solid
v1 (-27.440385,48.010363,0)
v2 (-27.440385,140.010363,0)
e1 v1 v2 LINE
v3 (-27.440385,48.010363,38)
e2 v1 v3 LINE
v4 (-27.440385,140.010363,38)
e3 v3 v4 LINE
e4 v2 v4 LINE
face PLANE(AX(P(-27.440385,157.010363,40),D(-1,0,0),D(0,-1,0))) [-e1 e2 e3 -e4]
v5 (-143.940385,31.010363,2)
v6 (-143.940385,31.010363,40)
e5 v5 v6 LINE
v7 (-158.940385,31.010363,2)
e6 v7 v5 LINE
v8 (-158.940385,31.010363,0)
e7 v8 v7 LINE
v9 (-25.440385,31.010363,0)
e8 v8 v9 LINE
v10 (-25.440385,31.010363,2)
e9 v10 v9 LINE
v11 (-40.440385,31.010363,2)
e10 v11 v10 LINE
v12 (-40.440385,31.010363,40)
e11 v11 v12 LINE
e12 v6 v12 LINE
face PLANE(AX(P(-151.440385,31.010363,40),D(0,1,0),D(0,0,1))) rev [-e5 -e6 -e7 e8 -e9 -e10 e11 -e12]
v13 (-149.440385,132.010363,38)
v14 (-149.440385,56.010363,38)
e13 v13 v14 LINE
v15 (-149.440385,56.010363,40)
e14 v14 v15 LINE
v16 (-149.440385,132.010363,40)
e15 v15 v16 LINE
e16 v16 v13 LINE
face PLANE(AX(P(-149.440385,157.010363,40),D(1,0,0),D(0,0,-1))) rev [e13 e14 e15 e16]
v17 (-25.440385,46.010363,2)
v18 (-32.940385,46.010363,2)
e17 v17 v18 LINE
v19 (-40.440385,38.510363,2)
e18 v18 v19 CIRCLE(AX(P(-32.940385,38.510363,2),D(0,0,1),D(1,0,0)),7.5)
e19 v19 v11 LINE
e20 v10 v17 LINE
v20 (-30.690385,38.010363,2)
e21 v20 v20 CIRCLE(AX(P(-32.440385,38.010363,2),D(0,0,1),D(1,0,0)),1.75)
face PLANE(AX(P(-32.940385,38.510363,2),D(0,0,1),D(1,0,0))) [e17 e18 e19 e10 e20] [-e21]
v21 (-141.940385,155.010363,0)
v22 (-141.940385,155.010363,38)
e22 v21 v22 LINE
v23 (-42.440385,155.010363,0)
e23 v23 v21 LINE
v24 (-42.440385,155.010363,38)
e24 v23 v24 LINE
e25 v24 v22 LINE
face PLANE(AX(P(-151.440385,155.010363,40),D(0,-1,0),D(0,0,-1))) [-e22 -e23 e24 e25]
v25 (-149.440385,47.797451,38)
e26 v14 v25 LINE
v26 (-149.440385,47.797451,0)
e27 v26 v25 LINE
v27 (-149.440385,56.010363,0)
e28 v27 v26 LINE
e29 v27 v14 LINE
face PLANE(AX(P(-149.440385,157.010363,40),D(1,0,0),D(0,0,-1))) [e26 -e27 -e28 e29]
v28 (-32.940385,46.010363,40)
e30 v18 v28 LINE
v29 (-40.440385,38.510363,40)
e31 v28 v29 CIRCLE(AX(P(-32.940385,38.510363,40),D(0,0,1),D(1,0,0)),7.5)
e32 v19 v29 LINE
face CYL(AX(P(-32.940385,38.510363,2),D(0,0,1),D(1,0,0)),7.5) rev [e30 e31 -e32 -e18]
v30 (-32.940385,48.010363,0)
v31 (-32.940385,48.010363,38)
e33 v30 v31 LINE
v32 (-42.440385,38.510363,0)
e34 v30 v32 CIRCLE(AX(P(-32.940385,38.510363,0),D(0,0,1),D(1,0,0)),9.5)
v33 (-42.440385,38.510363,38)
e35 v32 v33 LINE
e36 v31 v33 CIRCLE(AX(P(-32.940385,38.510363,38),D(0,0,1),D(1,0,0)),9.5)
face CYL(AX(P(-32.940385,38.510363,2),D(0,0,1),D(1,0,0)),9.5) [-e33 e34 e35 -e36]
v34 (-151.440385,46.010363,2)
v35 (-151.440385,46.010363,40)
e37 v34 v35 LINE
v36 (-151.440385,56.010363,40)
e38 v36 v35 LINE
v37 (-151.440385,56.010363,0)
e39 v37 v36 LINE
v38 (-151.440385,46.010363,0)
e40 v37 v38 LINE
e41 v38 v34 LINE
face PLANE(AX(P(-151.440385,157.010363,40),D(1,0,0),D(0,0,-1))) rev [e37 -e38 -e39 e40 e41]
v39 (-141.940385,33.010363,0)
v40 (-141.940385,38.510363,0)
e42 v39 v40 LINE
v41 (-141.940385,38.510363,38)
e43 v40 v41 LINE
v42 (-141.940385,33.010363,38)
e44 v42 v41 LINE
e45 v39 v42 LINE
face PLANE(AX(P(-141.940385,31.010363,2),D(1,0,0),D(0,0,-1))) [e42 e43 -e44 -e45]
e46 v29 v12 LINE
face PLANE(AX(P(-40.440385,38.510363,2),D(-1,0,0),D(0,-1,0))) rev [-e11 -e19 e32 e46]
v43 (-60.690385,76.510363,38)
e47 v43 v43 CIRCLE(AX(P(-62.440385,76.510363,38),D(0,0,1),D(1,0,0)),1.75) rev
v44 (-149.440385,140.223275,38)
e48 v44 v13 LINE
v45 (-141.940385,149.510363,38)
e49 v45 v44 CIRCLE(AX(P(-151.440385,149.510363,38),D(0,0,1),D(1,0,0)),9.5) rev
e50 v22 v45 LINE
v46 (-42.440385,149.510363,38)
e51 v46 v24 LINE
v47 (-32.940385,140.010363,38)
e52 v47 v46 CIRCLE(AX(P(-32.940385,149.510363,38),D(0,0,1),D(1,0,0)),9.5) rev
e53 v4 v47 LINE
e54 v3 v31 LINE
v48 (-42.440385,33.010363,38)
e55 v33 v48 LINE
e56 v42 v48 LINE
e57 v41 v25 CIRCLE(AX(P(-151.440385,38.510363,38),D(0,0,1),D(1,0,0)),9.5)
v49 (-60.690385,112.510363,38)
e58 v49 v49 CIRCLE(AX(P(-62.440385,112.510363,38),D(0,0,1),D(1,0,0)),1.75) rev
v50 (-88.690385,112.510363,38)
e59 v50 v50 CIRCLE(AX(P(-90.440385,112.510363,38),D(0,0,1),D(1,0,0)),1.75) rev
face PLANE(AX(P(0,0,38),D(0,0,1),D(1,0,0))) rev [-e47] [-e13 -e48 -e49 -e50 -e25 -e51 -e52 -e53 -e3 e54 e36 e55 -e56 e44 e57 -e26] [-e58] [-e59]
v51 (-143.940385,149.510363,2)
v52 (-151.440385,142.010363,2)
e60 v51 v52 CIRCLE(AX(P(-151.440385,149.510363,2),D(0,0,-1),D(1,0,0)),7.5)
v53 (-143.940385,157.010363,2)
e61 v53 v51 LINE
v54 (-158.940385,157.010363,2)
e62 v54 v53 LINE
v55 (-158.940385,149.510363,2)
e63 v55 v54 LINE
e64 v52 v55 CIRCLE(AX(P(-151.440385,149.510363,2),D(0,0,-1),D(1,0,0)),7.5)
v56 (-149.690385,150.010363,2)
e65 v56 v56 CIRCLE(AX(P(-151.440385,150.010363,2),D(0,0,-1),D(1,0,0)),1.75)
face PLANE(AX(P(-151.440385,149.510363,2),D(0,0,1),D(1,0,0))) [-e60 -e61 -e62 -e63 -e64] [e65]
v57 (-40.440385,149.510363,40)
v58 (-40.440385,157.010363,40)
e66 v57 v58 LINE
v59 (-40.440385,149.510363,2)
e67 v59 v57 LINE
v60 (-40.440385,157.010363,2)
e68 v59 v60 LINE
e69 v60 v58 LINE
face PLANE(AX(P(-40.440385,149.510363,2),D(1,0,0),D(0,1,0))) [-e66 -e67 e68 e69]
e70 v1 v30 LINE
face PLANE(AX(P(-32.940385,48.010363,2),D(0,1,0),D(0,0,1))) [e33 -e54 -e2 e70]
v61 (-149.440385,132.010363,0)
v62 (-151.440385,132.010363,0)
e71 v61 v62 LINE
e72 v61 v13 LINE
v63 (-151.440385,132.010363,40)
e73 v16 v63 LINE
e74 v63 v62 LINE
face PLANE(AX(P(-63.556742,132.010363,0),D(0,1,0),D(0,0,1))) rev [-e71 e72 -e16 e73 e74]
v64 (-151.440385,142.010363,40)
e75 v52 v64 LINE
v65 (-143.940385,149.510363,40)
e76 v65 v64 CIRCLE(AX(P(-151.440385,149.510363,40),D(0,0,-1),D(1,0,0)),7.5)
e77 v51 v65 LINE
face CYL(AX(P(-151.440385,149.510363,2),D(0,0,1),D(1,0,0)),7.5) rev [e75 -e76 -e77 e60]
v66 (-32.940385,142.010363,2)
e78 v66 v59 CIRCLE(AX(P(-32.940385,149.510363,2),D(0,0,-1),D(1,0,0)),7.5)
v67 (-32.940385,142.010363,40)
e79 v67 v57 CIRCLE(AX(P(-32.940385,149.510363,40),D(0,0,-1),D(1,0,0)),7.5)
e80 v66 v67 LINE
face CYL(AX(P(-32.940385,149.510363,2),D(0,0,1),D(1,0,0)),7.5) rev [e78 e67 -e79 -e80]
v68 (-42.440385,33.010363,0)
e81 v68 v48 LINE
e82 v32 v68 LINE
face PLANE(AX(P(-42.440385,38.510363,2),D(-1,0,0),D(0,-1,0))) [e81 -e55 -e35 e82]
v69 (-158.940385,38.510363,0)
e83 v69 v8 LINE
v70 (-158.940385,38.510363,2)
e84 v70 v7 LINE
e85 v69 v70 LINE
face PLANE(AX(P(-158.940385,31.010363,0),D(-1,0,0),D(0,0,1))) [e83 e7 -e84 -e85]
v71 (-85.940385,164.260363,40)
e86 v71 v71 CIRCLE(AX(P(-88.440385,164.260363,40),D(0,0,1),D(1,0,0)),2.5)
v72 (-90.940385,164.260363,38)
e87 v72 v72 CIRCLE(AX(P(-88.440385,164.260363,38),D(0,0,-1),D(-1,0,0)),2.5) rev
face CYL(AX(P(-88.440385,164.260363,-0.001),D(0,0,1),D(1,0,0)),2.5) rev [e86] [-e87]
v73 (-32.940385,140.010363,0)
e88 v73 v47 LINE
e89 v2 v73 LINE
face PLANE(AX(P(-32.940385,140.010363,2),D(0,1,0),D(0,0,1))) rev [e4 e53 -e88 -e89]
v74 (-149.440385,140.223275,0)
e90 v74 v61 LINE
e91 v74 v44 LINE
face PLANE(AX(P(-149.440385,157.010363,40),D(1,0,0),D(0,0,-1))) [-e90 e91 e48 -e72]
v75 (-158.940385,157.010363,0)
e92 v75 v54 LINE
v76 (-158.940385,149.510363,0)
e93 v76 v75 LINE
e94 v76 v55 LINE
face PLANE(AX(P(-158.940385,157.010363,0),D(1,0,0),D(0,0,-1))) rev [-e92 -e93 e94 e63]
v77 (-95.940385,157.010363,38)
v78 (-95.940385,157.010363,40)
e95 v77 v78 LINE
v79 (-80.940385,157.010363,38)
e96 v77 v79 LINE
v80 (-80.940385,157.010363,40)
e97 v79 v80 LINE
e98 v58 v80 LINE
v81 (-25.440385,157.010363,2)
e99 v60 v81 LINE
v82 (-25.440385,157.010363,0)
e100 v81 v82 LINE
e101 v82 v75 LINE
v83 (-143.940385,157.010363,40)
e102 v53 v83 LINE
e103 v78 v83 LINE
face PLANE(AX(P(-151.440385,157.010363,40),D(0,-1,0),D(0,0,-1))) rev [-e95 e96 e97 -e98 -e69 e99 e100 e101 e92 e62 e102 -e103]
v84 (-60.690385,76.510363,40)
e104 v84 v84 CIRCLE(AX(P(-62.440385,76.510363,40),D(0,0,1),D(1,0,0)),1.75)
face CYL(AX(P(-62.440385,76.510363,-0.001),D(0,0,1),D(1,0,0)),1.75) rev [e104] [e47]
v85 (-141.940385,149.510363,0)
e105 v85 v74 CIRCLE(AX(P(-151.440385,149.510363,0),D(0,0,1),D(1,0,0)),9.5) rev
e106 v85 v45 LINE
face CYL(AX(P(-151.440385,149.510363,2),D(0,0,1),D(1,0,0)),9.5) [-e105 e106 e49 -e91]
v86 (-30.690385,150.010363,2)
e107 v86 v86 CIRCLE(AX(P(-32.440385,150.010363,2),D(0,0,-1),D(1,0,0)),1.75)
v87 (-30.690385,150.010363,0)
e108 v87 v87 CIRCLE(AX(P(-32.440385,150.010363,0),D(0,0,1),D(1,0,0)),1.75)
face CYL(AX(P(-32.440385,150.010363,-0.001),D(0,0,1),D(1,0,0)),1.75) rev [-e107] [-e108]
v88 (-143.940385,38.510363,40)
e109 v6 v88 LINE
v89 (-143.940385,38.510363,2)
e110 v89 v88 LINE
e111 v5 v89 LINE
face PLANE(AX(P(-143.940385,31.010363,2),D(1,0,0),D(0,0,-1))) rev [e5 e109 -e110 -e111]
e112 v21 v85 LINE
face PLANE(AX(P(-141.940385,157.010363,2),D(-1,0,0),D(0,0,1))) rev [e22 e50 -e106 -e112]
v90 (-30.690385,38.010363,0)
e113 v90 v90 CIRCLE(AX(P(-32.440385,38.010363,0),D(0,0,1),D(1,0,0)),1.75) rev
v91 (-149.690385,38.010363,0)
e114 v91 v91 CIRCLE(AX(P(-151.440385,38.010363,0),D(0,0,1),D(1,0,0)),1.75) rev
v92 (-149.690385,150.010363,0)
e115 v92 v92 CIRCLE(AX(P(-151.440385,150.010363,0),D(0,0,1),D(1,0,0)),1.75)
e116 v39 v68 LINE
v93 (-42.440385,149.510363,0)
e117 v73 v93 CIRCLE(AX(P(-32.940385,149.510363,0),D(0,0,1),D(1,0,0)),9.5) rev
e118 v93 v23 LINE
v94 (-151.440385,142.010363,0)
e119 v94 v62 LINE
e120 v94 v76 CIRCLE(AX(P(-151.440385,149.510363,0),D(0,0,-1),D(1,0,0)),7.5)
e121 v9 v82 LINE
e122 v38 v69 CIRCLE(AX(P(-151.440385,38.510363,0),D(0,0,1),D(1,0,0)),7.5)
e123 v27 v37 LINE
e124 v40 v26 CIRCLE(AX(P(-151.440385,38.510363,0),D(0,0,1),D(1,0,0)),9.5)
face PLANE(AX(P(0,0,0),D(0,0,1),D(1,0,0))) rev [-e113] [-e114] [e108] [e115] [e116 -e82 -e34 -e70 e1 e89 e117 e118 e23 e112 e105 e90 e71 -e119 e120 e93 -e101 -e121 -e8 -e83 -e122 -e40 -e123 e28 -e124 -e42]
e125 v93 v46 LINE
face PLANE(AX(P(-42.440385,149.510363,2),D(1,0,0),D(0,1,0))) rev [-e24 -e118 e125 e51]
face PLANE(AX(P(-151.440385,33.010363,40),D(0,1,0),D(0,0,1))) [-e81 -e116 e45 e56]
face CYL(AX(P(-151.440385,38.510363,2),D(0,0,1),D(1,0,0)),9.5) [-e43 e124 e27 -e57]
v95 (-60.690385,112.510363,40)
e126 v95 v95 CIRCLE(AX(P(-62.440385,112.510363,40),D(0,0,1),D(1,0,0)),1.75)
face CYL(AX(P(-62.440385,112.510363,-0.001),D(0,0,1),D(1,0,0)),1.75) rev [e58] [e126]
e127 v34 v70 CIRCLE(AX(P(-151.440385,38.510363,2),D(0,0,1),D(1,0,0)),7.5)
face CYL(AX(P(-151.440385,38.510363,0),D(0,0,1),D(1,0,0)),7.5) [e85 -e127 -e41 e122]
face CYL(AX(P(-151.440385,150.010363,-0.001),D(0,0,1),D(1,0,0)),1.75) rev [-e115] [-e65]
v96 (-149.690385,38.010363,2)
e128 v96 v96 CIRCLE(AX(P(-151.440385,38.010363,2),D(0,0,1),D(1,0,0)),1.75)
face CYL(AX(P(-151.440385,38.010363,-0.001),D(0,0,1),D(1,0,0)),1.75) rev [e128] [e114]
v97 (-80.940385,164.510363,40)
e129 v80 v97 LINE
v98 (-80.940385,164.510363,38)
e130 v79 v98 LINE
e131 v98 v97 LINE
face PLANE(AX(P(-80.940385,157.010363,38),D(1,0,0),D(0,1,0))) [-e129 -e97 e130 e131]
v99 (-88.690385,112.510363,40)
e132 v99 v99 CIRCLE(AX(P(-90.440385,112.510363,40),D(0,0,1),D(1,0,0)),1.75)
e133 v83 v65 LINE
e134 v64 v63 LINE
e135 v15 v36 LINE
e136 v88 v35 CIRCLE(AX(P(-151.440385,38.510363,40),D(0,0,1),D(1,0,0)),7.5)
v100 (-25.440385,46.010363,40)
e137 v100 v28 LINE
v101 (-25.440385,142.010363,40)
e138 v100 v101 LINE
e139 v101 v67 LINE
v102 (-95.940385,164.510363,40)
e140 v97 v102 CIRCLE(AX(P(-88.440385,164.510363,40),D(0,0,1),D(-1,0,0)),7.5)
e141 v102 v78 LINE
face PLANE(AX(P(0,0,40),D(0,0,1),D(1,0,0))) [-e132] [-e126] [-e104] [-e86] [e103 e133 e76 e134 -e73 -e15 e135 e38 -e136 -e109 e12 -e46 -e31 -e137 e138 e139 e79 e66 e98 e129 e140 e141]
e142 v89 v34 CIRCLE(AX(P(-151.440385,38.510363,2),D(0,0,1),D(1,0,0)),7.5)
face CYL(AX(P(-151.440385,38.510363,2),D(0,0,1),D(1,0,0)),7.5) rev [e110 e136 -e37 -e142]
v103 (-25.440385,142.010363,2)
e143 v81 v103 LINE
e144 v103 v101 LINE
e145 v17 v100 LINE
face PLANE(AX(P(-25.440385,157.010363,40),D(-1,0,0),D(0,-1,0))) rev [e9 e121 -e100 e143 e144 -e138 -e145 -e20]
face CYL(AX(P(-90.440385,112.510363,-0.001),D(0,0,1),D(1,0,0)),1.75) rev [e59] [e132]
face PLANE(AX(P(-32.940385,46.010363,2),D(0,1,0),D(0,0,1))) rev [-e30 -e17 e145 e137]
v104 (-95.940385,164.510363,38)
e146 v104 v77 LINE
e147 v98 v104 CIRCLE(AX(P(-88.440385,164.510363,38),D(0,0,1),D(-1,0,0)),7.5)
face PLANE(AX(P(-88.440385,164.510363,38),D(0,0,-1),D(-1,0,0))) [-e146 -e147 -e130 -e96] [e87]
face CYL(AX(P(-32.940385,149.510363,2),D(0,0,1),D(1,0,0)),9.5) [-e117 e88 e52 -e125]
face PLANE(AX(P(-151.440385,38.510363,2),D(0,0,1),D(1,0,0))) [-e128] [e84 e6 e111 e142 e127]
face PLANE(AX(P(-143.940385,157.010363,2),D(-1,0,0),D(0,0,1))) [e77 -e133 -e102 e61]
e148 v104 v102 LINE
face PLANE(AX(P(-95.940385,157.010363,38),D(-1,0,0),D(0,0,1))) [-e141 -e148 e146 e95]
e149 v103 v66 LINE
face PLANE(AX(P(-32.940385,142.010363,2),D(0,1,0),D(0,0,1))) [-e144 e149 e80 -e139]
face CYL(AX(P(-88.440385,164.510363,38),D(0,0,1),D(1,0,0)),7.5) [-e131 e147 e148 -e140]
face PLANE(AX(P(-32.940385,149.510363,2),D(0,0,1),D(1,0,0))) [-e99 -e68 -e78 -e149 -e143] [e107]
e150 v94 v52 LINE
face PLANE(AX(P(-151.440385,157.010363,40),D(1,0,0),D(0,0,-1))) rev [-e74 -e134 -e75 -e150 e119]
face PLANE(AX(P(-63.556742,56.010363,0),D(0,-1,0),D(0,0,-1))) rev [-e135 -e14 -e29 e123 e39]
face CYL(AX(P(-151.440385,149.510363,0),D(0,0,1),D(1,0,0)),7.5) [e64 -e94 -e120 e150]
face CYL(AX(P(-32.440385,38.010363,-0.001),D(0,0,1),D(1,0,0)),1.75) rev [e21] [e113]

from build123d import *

# Parameters (mm, degrees)
ESQUISSE1_W                = 126
ESQUISSE1_H                = 126
BOSS_EXTRU_1_DEPTH         = 40
ENL_V_MAT_EXTRU_1_DEPTH    = 38
ENL_V_MAT_EXTRU_2_REACH    = 223.428
ESQUISSE4_R                = 1.75
ENL_V_MAT_EXTRU_5_DEPTH    = 38
COQUE1_DEPTH               = 38
BOSS_EXTRU_3_DEPTH         = 2
ENL_V_MAT_EXTRU_6_REACH    = 228.624
ESQUISSE13_R               = 1.75
ENL_V_MAT_EXTRU_7_REACH    = 228.968
ESQUISSE14_R               = 1.75
R_P_TITION_LIN_AIRE1_COUNT = 2
R_P_TITION_LIN_AIRE1_PITCH = 28
ENL_V_MAT_EXTRU_8_REACH    = 228.968
ESQUISSE15_R               = 1.75
ESQUISSE16_W               = 40
ESQUISSE16_H               = 76
ENL_V_MAT_EXTRU_9_DEPTH    = 2
BOSS_EXTRU_4_DEPTH         = 2
ENL_V_MAT_EXTRU_10_REACH   = 239.591
ESQUISSE19_R               = 2.5


# Read off the part's stored shape, not the designer's step: Coque1
with BuildPart() as part:
    # Esquisse1 → Boss.-Extru.1 (new body)
    with BuildSketch(Plane.XY):
        with Locations((-88.440384558, 94.010362694)):
            Rectangle(ESQUISSE1_W, ESQUISSE1_H)
    extrude(amount=BOSS_EXTRU_1_DEPTH)

    # Esquisse2 → Enlèv. mat.-Extru.1 (cut)
    with BuildSketch(Plane.XY.offset(40)):
        with BuildLine():
            Line((-40.440384558, 31.010362694), (-25.440384558, 31.010362694))
            Line((-25.440384558, 31.010362694), (-25.440384558, 46.010362694))
            Line((-25.440384558, 46.010362694), (-32.940384558, 46.010362694))
            ThreePointArc((-32.940384558, 46.010362694), (-38.243685417, 43.813663553), (-40.440384558, 38.510362694))
            Line((-40.440384558, 38.510362694), (-40.440384558, 31.010362694))
        make_face()
    enl_v_mat_extru_1 = extrude(amount=-ENL_V_MAT_EXTRU_1_DEPTH, mode=Mode.SUBTRACT)

    # Esquisse4 → Enlèv. mat.-Extru.2 (cut, up to next)
    with BuildSketch(Plane.XY.offset(2), mode=Mode.PRIVATE) as enl_v_mat_extru_2_sk1:
        with Locations((-32.440384558, 38.010362694)):
            Circle(ESQUISSE4_R)
    enl_v_mat_extru_2_tool1 = extrude(enl_v_mat_extru_2_sk1.sketch, amount=-ENL_V_MAT_EXTRU_2_REACH, mode=Mode.PRIVATE) & part.part
    enl_v_mat_extru_2 = enl_v_mat_extru_2_tool1.solids().sort_by_distance((-32.440385, 38.010363, 2))[0]
    add(enl_v_mat_extru_2, mode=Mode.SUBTRACT)

    # Symétrie1: Enlèv. mat.-Extru.1, Enlèv. mat.-Extru.2 across plane
    add(enl_v_mat_extru_1.mirror(Plane(origin=(0, 94.010362694, 0), x_dir=(0, 0, 1), z_dir=(0, -1, 0))), mode=Mode.SUBTRACT)
    add(enl_v_mat_extru_2.mirror(Plane(origin=(0, 94.010362694, 0), x_dir=(0, 0, 1), z_dir=(0, -1, 0))), mode=Mode.SUBTRACT)

    # Esquisse10 → Enlèv. mat.-Extru.5 (cut)
    with BuildSketch(Plane.XY.offset(40)):
        with BuildLine():
            Line((-151.440384558, 46.010362694), (-151.440384558, 31.010362694))
            Line((-151.440384558, 31.010362694), (-143.940384558, 31.010362694))
            Line((-143.940384558, 31.010362694), (-143.940384558, 38.510362694))
            ThreePointArc((-143.940384558, 38.510362694), (-146.137083699, 43.813663553), (-151.440384558, 46.010362694))
        make_face()
    enl_v_mat_extru_5 = extrude(amount=-ENL_V_MAT_EXTRU_5_DEPTH, mode=Mode.SUBTRACT)

    # Symétrie3: Enlèv. mat.-Extru.5 across plane
    add(enl_v_mat_extru_5.mirror(Plane(origin=(0, 94.010362694, 0), x_dir=(0, 0, 1), z_dir=(0, -1, 0))), mode=Mode.SUBTRACT)

    # Coque1 outline → Coque1 (cut)
    with BuildSketch(Plane.XY):
        with BuildLine():
            Line((-42.440384558, 155.010362694), (-141.940384558, 155.010362694))
            Line((-141.940384558, 155.010362694), (-141.940384558, 149.510362694))
            ThreePointArc((-141.940384558, 149.510362694), (-144.049511808, 143.541694501), (-149.440384558, 140.223274884))
            Line((-149.440384558, 140.223274884), (-149.440384558, 47.797450505))
            ThreePointArc((-149.440384558, 47.797450505), (-144.049511808, 44.479030887), (-141.940384558, 38.510362694))
            Line((-141.940384558, 38.510362694), (-141.940384558, 33.010362694))
            Line((-141.940384558, 33.010362694), (-42.440384558, 33.010362694))
            Line((-42.440384558, 33.010362694), (-42.440384558, 38.510362694))
            ThreePointArc((-42.440384558, 38.510362694), (-39.657898979, 45.227877116), (-32.940384558, 48.010362694))
            Line((-32.940384558, 48.010362694), (-27.440384558, 48.010362694))
            Line((-27.440384558, 48.010362694), (-27.440384558, 140.010362694))
            Line((-27.440384558, 140.010362694), (-32.940384558, 140.010362694))
            ThreePointArc((-32.940384558, 140.010362694), (-39.657898979, 142.792848273), (-42.440384558, 149.510362694))
            Line((-42.440384558, 149.510362694), (-42.440384558, 155.010362694))
        make_face()
    extrude(amount=COQUE1_DEPTH, mode=Mode.SUBTRACT)

    # Esquisse12 → Boss.-Extru.3 (add)
    with BuildSketch(Plane.XY.offset(2)):
        with BuildLine():
            Line((-158.940384558, 31.010362694), (-158.940384558, 38.510362694))
            ThreePointArc((-158.940384558, 38.510362694), (-156.743685417, 43.813663553), (-151.440384558, 46.010362694))
            Line((-151.440384558, 46.010362694), (-151.440384558, 31.010362694))
            Line((-151.440384558, 31.010362694), (-158.940384558, 31.010362694))
        make_face()
    boss_extru_3 = extrude(amount=-BOSS_EXTRU_3_DEPTH)

    # Esquisse13 → Enlèv. mat.-Extru.6 (cut, up to next)
    with BuildSketch(Plane.XY.offset(2), mode=Mode.PRIVATE) as enl_v_mat_extru_6_sk1:
        with Locations((-151.440384558, 38.010362694)):
            Circle(ESQUISSE13_R)
    enl_v_mat_extru_6_tool1 = extrude(enl_v_mat_extru_6_sk1.sketch, amount=-ENL_V_MAT_EXTRU_6_REACH, mode=Mode.PRIVATE) & part.part
    enl_v_mat_extru_6 = enl_v_mat_extru_6_tool1.solids().sort_by_distance((-151.440385, 38.010363, 2))[0]
    add(enl_v_mat_extru_6, mode=Mode.SUBTRACT)

    # Symétrie5: Boss.-Extru.3, Enlèv. mat.-Extru.6 across plane
    add(boss_extru_3.mirror(Plane(origin=(0, 94.010362694, 0), x_dir=(0, 0, 1), z_dir=(0, -1, 0))))
    add(enl_v_mat_extru_6.mirror(Plane(origin=(0, 94.010362694, 0), x_dir=(0, 0, 1), z_dir=(0, -1, 0))), mode=Mode.SUBTRACT)

    # Esquisse14 → Enlèv. mat.-Extru.7 (cut, up to next)
    with BuildSketch(Plane.XY.offset(40), mode=Mode.PRIVATE) as enl_v_mat_extru_7_sk1:
        with Locations((-90.440384558, 112.510362694)):
            Circle(ESQUISSE14_R)
    enl_v_mat_extru_7_tool1 = extrude(enl_v_mat_extru_7_sk1.sketch, amount=-ENL_V_MAT_EXTRU_7_REACH, mode=Mode.PRIVATE) & part.part
    enl_v_mat_extru_7 = enl_v_mat_extru_7_tool1.solids().sort_by_distance((-90.440385, 112.510363, 40))[0]
    add(enl_v_mat_extru_7, mode=Mode.SUBTRACT)

    # Répétition linéaire1: Enlèv. mat.-Extru.7 ×2
    with Locations(*[(i * R_P_TITION_LIN_AIRE1_PITCH, 0, 0) for i in range(1, R_P_TITION_LIN_AIRE1_COUNT)]):
        add(enl_v_mat_extru_7, mode=Mode.SUBTRACT)

    # Esquisse15 → Enlèv. mat.-Extru.8 (cut, up to next)
    with BuildSketch(Plane.XY.offset(40), mode=Mode.PRIVATE) as enl_v_mat_extru_8_sk1:
        with Locations((-62.440384558, 76.510362694)):
            Circle(ESQUISSE15_R)
    enl_v_mat_extru_8_tool1 = extrude(enl_v_mat_extru_8_sk1.sketch, amount=-ENL_V_MAT_EXTRU_8_REACH, mode=Mode.PRIVATE) & part.part
    add(enl_v_mat_extru_8_tool1.solids().sort_by_distance((-62.440385, 76.510363, 40))[0], mode=Mode.SUBTRACT)

    # Esquisse16 → Enlèv. mat.-Extru.9 (cut)
    with BuildSketch(Plane.ZY.offset(151.440384558)):
        with Locations((20, 94.010362694)):
            Rectangle(ESQUISSE16_W, ESQUISSE16_H)
    extrude(amount=-ENL_V_MAT_EXTRU_9_DEPTH, mode=Mode.SUBTRACT)

    # Esquisse17 → Boss.-Extru.4 (add)
    with BuildSketch(Plane.XY.offset(40)):
        with BuildLine():
            Line((-95.940384558, 157.010362694), (-80.940384558, 157.010362694))
            Line((-80.940384558, 157.010362694), (-80.940384558, 164.510362694))
            ThreePointArc((-80.940384558, 164.510362694), (-88.440384558, 172.010362694), (-95.940384558, 164.510362694))
            Line((-95.940384558, 164.510362694), (-95.940384558, 157.010362694))
        make_face()
    extrude(amount=-BOSS_EXTRU_4_DEPTH)

    # Esquisse19 → Enlèv. mat.-Extru.10 (cut, up to next)
    with BuildSketch(Plane.XY.offset(40), mode=Mode.PRIVATE) as enl_v_mat_extru_10_sk1:
        with Locations((-88.440384558, 164.260362694)):
            Circle(ESQUISSE19_R)
    enl_v_mat_extru_10_tool1 = extrude(enl_v_mat_extru_10_sk1.sketch, amount=-ENL_V_MAT_EXTRU_10_REACH, mode=Mode.PRIVATE) & part.part
    add(enl_v_mat_extru_10_tool1.solids().sort_by_distance((-88.440385, 164.260363, 40))[0], mode=Mode.SUBTRACT)


solid = part.part
